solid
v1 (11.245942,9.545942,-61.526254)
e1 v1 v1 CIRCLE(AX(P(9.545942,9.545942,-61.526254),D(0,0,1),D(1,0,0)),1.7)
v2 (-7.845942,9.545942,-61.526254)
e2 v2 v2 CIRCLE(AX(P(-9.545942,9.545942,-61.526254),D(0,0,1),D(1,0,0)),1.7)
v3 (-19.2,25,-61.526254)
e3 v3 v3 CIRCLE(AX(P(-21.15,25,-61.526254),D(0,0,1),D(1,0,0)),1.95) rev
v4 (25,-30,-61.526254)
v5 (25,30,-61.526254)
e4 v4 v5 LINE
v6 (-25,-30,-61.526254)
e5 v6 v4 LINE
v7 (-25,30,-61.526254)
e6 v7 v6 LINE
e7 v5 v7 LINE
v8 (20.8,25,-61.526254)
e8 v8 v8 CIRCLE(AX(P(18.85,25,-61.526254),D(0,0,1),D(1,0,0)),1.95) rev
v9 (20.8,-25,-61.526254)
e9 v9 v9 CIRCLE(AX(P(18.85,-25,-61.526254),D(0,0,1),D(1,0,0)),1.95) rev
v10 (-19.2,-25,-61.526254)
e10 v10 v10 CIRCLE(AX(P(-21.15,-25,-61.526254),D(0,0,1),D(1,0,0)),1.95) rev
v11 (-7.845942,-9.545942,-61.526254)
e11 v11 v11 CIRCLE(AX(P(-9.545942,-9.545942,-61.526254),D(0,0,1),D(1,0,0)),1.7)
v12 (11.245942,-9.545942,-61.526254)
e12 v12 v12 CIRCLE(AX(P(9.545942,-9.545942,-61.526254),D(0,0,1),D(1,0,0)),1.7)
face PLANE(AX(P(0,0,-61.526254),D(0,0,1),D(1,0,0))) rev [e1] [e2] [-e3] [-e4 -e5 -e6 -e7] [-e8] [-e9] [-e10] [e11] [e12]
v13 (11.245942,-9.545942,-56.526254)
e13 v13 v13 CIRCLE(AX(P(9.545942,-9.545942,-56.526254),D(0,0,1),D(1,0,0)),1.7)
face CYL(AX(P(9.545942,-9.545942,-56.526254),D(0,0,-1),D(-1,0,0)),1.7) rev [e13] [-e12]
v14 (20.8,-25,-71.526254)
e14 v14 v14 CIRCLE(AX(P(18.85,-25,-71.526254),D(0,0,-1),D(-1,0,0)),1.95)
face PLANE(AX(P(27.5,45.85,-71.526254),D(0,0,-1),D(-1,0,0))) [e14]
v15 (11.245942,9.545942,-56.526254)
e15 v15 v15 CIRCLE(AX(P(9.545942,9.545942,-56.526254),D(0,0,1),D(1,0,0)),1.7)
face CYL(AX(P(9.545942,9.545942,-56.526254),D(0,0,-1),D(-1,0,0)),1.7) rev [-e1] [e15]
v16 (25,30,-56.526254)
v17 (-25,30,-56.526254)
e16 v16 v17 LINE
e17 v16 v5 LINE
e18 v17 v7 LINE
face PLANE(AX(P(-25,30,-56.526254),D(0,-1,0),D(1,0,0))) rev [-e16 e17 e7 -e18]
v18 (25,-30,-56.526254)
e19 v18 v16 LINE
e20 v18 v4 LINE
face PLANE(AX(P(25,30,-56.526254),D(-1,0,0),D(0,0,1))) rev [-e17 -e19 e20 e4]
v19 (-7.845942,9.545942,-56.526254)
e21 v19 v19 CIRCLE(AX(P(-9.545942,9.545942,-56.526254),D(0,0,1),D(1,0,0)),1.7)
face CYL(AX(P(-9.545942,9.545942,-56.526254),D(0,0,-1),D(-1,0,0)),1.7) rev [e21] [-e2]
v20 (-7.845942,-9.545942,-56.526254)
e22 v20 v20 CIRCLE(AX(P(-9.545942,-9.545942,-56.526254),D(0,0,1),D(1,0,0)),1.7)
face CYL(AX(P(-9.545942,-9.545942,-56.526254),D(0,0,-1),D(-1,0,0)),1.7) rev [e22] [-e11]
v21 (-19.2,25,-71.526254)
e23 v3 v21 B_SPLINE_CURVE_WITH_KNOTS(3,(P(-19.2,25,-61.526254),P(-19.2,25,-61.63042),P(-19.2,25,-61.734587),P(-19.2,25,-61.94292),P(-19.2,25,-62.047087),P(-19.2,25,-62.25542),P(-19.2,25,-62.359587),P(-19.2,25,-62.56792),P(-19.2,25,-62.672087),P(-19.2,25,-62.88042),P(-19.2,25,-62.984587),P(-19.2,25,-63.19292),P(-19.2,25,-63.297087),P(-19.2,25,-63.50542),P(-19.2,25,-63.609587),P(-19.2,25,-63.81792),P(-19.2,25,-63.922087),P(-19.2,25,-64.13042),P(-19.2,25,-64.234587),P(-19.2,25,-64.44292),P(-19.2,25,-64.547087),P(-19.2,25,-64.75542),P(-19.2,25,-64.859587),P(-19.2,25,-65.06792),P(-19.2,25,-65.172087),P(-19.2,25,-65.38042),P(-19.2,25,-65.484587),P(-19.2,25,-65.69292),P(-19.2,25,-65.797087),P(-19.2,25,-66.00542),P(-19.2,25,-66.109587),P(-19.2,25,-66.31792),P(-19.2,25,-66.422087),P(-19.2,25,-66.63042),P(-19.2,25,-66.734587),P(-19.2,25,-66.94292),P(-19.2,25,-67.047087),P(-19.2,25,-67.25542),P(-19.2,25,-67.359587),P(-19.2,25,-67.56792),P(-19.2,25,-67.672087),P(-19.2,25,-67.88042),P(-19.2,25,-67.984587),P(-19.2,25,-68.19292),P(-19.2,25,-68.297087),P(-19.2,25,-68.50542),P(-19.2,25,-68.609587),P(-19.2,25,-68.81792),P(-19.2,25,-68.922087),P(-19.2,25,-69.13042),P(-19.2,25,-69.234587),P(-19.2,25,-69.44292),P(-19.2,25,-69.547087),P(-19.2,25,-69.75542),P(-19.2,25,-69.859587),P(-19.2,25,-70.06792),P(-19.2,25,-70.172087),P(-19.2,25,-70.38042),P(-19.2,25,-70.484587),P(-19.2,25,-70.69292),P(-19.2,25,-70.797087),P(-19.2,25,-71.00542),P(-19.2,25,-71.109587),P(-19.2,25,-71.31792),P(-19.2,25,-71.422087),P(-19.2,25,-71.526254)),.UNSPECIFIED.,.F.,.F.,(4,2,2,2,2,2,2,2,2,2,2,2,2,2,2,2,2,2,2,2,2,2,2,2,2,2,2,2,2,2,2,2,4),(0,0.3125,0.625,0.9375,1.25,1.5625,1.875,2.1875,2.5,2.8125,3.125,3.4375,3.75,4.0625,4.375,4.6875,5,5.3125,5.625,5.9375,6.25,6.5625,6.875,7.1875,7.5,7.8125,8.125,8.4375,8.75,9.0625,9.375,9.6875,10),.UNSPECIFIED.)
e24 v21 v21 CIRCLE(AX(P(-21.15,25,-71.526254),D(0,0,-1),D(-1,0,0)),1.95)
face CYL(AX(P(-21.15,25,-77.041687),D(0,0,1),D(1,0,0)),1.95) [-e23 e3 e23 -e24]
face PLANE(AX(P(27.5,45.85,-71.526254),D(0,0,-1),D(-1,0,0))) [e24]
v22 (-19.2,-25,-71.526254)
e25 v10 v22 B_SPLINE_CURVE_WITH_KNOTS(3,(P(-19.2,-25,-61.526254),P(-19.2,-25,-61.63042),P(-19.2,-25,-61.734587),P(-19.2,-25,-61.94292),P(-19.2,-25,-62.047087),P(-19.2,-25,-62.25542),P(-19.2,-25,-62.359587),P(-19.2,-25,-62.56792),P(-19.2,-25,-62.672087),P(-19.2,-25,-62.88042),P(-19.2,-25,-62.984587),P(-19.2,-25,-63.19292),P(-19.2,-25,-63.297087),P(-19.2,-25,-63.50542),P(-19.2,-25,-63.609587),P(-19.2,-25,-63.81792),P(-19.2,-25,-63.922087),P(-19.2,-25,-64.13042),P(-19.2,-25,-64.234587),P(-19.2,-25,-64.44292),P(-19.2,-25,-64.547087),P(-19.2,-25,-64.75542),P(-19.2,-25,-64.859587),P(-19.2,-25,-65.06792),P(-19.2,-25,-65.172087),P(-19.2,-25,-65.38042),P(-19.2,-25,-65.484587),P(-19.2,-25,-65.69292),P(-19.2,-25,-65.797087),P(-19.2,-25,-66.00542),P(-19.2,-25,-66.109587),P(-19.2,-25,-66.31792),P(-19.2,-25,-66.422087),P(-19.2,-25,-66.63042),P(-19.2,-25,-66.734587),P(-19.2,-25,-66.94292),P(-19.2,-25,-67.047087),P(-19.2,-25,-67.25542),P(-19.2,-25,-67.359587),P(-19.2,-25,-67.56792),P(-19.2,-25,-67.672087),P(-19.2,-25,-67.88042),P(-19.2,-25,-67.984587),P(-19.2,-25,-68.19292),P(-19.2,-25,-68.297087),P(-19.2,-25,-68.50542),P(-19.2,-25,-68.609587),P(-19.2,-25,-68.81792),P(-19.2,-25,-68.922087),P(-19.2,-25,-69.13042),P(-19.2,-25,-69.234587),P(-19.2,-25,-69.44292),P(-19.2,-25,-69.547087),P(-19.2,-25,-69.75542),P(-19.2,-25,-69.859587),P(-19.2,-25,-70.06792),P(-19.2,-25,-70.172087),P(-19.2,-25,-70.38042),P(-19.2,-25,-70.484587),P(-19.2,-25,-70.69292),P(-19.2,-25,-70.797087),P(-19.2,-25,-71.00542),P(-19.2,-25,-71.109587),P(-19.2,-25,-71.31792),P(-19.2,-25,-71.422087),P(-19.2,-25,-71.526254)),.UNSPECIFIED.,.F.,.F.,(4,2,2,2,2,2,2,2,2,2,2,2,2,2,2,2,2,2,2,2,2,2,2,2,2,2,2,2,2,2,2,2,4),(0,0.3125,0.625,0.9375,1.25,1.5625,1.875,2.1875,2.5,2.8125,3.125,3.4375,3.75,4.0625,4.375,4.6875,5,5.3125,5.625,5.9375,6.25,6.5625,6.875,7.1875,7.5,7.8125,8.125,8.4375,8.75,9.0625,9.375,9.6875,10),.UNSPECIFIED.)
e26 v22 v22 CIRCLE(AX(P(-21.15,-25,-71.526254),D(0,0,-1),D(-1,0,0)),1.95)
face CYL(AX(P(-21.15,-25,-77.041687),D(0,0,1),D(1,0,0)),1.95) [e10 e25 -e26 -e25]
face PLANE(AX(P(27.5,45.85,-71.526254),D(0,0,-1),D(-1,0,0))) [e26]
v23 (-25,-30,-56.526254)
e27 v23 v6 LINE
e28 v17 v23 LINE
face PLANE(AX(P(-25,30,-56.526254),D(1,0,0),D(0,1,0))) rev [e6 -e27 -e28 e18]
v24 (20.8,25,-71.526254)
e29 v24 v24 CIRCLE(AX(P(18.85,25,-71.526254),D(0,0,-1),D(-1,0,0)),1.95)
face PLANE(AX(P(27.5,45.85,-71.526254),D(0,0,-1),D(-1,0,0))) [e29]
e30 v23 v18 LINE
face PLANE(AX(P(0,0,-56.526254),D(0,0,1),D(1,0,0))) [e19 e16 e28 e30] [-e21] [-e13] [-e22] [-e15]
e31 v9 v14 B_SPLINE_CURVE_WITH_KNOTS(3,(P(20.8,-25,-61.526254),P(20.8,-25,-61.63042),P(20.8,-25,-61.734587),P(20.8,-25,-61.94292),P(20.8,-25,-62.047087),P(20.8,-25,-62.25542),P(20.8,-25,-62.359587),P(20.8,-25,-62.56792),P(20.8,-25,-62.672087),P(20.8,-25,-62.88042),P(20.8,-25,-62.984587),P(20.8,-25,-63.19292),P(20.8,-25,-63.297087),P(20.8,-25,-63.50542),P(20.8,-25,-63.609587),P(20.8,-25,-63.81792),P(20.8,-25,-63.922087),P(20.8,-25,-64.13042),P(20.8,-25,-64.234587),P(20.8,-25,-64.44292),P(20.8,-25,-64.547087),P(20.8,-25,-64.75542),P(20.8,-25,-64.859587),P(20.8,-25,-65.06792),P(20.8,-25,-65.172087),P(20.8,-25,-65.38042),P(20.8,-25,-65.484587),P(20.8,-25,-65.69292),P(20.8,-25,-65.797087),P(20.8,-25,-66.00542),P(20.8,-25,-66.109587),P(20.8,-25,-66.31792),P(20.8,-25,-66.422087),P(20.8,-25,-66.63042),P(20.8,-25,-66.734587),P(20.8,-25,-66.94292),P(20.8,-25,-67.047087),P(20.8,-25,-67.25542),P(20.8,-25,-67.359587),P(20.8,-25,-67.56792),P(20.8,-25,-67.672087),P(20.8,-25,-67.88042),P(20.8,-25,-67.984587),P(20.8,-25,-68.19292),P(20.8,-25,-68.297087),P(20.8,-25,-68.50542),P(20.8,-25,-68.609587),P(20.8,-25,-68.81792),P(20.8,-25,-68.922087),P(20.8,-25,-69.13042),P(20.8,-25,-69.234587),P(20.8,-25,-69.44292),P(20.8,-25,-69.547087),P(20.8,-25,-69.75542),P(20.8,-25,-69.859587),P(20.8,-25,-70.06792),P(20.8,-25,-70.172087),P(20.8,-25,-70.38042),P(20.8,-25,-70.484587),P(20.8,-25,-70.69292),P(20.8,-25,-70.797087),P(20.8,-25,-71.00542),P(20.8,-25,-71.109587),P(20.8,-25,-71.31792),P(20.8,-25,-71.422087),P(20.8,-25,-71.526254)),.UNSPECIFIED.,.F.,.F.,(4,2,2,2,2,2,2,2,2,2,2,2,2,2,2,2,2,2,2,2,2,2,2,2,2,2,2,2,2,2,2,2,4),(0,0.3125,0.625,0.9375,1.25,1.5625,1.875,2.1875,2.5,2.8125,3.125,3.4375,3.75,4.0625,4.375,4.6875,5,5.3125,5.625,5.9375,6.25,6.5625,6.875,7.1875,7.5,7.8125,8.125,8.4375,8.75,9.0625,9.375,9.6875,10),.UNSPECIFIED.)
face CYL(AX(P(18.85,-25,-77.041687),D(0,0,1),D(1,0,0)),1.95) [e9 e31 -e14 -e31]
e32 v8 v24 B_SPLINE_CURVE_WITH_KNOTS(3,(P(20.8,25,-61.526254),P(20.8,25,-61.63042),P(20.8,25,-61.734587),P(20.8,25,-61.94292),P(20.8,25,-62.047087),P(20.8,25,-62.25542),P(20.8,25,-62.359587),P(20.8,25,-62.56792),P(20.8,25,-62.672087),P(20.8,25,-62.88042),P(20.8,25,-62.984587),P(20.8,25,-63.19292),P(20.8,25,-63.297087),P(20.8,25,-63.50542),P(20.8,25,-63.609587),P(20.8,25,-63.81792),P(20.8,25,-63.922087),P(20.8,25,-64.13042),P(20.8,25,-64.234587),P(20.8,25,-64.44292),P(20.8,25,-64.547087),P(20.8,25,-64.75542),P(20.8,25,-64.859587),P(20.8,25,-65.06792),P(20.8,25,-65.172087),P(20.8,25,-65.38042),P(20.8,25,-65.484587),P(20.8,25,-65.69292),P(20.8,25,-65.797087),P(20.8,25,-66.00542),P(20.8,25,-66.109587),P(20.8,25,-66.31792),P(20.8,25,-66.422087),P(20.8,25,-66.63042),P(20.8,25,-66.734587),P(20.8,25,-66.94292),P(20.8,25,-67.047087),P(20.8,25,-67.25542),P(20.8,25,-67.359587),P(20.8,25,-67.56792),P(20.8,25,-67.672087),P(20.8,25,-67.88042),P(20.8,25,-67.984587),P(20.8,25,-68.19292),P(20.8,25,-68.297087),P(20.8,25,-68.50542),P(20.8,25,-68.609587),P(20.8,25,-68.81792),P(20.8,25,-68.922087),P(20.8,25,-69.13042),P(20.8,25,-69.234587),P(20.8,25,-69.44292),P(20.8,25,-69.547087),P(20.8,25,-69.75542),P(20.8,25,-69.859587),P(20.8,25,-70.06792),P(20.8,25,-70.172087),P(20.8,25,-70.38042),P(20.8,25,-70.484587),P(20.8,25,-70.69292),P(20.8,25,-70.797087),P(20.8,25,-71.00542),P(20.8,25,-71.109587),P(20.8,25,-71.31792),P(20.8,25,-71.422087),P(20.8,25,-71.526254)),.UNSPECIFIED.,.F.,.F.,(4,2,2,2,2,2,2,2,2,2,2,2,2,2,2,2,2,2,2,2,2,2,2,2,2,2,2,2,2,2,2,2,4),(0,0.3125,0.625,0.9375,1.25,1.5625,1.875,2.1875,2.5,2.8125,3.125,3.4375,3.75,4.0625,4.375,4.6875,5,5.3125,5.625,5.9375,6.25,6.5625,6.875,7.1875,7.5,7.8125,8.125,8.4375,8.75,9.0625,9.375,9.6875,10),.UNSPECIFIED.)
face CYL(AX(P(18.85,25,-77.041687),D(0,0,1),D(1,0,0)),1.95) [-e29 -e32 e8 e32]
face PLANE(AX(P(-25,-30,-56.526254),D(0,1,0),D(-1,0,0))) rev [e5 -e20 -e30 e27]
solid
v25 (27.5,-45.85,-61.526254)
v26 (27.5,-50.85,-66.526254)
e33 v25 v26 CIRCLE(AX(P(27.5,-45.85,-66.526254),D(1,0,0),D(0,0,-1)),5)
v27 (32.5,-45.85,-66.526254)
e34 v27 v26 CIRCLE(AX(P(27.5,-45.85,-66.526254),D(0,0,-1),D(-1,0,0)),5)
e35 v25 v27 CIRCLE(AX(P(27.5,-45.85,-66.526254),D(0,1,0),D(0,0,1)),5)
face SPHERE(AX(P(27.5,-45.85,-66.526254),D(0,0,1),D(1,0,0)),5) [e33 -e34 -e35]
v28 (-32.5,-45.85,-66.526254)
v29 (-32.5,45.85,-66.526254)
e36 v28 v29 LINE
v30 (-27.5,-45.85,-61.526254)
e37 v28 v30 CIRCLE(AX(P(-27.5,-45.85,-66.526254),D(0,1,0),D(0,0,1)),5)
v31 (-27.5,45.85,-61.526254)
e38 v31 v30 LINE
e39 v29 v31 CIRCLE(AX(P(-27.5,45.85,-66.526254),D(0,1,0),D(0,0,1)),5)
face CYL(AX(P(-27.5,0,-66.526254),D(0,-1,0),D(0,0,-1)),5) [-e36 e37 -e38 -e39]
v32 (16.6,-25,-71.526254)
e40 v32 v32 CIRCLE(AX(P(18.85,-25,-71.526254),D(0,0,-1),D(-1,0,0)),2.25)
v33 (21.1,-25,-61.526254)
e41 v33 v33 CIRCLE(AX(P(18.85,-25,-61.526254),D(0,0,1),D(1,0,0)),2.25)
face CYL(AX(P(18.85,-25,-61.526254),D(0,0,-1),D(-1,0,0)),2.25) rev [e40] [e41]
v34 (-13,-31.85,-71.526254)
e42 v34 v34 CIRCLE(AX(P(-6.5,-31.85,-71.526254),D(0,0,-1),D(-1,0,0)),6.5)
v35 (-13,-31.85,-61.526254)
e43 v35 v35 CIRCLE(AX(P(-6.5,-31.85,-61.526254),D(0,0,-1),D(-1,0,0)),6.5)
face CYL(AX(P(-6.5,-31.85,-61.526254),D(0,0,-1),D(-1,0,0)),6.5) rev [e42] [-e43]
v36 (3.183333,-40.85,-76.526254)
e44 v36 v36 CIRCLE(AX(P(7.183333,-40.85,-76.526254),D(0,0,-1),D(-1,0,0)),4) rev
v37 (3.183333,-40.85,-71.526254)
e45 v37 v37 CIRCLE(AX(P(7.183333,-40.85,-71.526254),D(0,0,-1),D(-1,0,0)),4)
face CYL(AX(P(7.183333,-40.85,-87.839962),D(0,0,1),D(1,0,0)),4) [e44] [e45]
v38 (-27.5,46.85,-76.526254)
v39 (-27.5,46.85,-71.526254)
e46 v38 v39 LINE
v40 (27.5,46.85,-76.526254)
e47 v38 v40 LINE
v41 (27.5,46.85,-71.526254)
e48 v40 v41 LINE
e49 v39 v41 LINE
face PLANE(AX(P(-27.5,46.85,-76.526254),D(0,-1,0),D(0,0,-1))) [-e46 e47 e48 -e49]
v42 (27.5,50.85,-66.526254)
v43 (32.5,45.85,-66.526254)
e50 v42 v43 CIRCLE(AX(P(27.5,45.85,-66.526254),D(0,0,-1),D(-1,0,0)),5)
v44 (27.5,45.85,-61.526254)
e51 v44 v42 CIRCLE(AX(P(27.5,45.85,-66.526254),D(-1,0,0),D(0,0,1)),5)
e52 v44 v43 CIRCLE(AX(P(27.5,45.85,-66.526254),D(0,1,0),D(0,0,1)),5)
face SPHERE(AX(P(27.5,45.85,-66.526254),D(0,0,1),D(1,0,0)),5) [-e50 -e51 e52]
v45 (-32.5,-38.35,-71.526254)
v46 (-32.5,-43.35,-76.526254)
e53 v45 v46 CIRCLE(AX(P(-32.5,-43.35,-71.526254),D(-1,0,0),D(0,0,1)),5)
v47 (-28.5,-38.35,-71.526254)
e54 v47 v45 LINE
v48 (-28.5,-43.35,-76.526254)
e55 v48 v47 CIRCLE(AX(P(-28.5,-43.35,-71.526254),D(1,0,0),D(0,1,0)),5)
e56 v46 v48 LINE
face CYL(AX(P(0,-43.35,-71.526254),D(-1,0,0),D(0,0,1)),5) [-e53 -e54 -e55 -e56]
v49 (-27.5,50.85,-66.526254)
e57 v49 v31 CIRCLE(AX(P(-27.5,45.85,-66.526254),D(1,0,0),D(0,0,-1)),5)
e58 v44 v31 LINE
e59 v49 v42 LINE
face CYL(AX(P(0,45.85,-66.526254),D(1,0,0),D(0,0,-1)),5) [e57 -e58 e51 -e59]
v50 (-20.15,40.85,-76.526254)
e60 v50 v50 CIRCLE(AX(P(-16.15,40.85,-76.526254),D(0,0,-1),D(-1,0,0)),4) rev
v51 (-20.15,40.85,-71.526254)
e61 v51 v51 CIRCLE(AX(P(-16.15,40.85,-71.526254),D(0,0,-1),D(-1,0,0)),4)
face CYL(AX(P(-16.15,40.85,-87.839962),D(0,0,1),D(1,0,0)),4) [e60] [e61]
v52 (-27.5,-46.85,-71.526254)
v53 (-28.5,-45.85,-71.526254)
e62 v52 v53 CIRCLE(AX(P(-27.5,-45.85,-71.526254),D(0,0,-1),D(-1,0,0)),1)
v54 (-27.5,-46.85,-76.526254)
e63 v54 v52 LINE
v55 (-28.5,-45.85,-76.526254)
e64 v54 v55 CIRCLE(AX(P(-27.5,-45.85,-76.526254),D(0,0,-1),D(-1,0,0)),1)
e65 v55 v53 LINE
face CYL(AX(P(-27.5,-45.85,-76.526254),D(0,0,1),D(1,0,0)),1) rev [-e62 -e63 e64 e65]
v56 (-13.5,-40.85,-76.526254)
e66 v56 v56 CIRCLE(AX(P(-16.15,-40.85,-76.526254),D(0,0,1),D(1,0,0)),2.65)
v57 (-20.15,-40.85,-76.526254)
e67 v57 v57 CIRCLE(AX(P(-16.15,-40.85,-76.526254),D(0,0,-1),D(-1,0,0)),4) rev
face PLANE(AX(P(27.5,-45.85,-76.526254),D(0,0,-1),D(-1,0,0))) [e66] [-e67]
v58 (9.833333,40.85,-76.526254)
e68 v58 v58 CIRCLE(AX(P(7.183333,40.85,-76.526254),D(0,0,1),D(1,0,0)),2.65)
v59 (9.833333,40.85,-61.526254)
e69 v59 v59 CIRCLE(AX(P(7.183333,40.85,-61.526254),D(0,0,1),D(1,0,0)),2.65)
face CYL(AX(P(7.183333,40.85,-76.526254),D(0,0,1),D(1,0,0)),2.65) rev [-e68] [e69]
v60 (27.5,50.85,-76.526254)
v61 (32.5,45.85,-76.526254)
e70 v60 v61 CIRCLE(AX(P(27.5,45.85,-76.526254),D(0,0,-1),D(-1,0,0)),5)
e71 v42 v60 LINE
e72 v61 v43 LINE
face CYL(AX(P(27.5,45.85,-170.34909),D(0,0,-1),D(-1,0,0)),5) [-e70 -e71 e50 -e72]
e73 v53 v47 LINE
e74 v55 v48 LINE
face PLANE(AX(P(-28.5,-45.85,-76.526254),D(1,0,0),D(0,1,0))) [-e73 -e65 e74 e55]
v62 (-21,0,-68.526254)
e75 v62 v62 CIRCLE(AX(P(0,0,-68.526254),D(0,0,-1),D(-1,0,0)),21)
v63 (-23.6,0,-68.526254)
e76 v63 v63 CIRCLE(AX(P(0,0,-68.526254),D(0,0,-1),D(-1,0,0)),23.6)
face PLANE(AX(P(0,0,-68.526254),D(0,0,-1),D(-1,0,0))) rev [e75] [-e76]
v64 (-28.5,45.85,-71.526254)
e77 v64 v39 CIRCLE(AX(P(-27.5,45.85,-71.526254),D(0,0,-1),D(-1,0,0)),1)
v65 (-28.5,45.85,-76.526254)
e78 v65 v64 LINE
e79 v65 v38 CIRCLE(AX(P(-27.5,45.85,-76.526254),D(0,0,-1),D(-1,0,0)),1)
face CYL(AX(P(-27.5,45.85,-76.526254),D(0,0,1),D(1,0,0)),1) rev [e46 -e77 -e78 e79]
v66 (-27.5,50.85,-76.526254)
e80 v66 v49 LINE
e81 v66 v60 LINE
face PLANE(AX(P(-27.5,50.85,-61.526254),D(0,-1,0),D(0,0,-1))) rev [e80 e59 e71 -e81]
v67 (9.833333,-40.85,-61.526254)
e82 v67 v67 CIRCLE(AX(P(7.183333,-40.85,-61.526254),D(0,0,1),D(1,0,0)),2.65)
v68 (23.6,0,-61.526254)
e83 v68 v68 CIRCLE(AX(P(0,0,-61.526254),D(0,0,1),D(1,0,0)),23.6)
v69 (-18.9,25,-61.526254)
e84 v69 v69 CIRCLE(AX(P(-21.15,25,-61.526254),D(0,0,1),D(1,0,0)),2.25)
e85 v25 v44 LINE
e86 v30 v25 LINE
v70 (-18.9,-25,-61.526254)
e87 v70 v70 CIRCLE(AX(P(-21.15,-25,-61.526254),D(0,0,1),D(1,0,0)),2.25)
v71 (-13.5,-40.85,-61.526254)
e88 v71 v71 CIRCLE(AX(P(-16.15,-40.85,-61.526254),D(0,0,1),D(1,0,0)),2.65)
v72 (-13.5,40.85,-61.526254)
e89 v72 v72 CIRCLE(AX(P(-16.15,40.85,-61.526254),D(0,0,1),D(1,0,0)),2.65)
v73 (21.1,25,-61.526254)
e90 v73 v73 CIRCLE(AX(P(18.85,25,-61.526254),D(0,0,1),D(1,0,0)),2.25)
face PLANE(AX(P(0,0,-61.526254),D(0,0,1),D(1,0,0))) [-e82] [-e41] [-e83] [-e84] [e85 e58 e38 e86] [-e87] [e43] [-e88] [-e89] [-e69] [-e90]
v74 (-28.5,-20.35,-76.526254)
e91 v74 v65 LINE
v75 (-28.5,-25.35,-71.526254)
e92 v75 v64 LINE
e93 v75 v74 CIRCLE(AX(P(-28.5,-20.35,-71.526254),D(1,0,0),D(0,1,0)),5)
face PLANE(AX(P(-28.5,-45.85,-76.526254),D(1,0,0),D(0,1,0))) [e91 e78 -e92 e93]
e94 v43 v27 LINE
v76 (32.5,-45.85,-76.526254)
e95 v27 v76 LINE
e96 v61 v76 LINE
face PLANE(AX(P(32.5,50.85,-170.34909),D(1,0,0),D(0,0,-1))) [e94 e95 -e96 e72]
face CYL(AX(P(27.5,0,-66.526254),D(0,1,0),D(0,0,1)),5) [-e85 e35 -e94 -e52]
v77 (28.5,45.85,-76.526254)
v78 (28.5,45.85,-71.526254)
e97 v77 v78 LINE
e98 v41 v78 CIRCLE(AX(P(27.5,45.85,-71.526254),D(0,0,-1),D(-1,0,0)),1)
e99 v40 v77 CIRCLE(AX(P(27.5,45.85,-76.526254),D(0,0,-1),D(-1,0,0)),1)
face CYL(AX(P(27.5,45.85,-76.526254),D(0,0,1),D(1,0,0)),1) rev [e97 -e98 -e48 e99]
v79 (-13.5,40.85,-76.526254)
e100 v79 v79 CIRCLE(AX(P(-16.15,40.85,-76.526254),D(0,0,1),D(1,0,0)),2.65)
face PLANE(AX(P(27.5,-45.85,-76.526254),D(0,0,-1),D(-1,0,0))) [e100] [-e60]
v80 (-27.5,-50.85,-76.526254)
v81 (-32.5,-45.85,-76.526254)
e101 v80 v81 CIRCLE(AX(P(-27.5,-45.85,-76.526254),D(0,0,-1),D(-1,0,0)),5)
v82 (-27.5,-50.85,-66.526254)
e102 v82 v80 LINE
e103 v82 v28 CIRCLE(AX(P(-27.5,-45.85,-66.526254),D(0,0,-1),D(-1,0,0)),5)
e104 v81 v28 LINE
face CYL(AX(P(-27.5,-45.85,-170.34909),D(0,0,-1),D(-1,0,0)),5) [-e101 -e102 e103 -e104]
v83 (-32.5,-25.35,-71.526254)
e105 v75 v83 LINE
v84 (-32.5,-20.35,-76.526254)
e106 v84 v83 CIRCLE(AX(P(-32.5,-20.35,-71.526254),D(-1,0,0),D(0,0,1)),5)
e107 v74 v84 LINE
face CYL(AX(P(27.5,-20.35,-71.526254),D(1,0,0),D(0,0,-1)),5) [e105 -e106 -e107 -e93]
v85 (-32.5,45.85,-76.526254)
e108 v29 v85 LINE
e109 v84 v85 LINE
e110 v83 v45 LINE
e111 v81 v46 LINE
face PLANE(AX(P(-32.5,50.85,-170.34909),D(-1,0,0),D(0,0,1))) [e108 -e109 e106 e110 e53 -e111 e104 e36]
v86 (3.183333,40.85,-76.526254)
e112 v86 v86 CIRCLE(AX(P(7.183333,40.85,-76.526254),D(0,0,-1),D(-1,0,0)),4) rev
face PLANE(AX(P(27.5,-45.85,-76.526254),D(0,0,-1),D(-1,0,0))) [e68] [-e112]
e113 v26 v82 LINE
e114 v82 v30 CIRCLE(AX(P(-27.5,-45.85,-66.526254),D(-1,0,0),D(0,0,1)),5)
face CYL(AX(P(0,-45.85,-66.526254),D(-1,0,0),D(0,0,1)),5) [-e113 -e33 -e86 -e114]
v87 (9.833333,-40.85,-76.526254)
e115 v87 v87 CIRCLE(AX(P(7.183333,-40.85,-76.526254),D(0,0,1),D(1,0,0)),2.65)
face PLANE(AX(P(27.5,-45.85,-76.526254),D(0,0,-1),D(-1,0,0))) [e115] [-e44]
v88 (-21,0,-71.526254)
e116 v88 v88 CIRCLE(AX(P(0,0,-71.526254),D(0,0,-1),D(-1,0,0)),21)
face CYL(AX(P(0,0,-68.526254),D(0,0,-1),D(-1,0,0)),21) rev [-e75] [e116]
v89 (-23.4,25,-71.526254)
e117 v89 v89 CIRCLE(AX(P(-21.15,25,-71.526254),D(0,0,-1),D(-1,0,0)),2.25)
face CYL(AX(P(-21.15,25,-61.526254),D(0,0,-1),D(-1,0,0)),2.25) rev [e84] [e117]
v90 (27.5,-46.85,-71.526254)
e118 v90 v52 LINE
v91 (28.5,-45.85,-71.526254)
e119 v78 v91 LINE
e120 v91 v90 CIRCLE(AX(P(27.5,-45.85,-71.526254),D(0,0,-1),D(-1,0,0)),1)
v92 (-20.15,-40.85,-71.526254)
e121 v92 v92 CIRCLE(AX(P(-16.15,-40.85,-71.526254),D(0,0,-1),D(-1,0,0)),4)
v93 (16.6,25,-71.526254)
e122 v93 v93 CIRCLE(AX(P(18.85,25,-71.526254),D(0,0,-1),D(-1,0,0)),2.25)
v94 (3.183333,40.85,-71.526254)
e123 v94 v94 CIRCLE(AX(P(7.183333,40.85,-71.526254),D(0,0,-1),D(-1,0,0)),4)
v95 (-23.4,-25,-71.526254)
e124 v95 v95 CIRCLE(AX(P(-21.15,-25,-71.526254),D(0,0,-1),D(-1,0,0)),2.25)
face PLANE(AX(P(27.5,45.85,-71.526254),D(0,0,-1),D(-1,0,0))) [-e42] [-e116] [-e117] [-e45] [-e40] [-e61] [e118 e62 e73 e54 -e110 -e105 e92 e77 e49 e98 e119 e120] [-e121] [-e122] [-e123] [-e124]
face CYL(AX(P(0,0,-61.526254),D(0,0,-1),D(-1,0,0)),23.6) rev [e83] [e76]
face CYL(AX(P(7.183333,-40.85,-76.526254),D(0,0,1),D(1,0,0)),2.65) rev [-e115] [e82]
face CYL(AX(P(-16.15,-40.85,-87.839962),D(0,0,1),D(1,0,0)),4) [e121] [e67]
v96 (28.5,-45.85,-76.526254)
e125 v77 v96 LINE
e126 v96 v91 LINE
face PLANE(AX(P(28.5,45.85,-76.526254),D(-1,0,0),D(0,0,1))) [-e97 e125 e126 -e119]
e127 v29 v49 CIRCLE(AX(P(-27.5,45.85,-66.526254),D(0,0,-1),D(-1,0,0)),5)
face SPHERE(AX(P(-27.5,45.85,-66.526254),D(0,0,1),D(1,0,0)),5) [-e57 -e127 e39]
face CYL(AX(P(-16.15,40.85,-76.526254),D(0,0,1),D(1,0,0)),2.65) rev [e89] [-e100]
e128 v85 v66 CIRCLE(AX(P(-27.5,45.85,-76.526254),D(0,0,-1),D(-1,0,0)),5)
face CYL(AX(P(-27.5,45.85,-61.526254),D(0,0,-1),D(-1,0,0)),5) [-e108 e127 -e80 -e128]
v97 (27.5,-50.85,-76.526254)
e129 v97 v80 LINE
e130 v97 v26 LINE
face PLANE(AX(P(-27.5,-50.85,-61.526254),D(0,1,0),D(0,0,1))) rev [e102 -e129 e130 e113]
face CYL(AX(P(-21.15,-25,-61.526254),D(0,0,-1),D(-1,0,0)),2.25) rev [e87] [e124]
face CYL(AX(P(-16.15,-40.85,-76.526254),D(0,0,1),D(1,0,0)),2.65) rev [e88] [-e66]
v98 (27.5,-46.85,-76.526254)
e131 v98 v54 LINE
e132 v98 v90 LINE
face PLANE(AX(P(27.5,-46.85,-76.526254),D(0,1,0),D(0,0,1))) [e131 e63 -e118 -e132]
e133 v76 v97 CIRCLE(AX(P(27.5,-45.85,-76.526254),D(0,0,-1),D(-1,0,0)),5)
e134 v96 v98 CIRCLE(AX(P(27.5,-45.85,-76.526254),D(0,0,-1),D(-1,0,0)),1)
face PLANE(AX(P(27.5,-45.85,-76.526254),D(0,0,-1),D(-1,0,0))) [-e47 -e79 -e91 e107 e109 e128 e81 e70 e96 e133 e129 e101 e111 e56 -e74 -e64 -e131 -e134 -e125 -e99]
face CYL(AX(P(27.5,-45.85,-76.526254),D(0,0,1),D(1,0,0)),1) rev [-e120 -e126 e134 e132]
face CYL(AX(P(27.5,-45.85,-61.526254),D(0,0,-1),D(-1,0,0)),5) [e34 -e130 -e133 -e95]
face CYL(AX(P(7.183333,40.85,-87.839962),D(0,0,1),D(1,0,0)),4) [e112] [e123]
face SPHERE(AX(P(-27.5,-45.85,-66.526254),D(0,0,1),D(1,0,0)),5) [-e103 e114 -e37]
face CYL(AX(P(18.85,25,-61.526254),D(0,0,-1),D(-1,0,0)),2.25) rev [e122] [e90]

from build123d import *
from build123d.topology import SkipClean

# Parameters (mm, degrees)
STOCK_PART13_1_START       = -68.526253649
STOCK_PART13_1_OUTLINE_W   = 55
STOCK_PART13_1_OUTLINE_H   = 101.7
STOCK_PART13_1_OUTLINE_R   = 1.65
STOCK_PART13_1_OUTLINE_R_2 = 2.25
STOCK_PART13_1_OUTLINE_R_3 = 23.6
STOCK_PART13_1_DEPTH       = 7
SKETCH3_W                  = 5
SKETCH3_H                  = 101.7
BOSS_EXTRUDE1_DEPTH        = 7
FILLET2_R                  = 5
EXTRUDE_THIN1_START        = 8
EXTRUDE_THIN1_DEPTH        = 8
FILLET3_R                  = 5
BOSS_EXTRUDE2_START        = 3
SKETCH7_R                  = 1.65
SKETCH7_R_2                = 2.25
SKETCH7_R_3                = 23.6
BOSS_EXTRUDE2_DEPTH        = 3
SKETCH8_R                  = 23.6
SKETCH8_R_2                = 21
BOSS_EXTRUDE3_DEPTH        = 3
BOSS_EXTRUDE4_START        = -15
SKETCH9_R                  = 4
SKETCH9_R_2                = 1.65
BOSS_EXTRUDE4_DEPTH        = 15
SKETCH10_R                 = 6.5
CUT_EXTRUDE1_DEPTH         = 62.171664192
SKETCH11_W                 = 4
SKETCH11_H                 = 13
CUT_EXTRUDE4_DEPTH         = 62.171664192
FILLET4_R                  = 5
SKETCH12_R                 = 2.65
CUT_EXTRUDE5_DEPTH         = 63.18498613
SKETCH14_W                 = 50
SKETCH14_H                 = 60
SKETCH14_R                 = 1.7
BOSS_EXTRUDE5_DEPTH        = 5
SKETCH16_R                 = 1.95
BOSS_EXTRUDE6_DEPTH        = 10


# Read off the part's stored shape, not the designer's step: Stock-Part13-1
with BuildPart() as part:
    # Stock-Part13-1 outline → Stock-Part13-1 (new body)
    with BuildSketch(Plane.XY.offset(STOCK_PART13_1_START)):
        Rectangle(STOCK_PART13_1_OUTLINE_W, STOCK_PART13_1_OUTLINE_H)
        with Locations((-16.15, -40.85)):
            Circle(STOCK_PART13_1_OUTLINE_R, mode=Mode.SUBTRACT)
        with Locations((-21.15, -25)):
            Circle(STOCK_PART13_1_OUTLINE_R_2, mode=Mode.SUBTRACT)
        with Locations((7.183333333, -40.85)):
            Circle(STOCK_PART13_1_OUTLINE_R, mode=Mode.SUBTRACT)
        with Locations((18.85, -25)):
            Circle(STOCK_PART13_1_OUTLINE_R_2, mode=Mode.SUBTRACT)
        with Locations((-21.15, 25)):
            Circle(STOCK_PART13_1_OUTLINE_R_2, mode=Mode.SUBTRACT)
        with Locations((-16.15, 40.85)):
            Circle(STOCK_PART13_1_OUTLINE_R, mode=Mode.SUBTRACT)
        Circle(STOCK_PART13_1_OUTLINE_R_3, mode=Mode.SUBTRACT)
        with Locations((18.85, 25)):
            Circle(STOCK_PART13_1_OUTLINE_R_2, mode=Mode.SUBTRACT)
        with Locations((7.183333333, 40.85)):
            Circle(STOCK_PART13_1_OUTLINE_R, mode=Mode.SUBTRACT)
    extrude(amount=STOCK_PART13_1_DEPTH)

    # Sketch3 → Boss-Extrude1 (add)
    with BuildSketch(Plane.XY.offset(-61.526253649)):
        with Locations((-30, 0)):
            Rectangle(SKETCH3_W, SKETCH3_H)
        with Locations((30, 0)):
            Rectangle(SKETCH3_W, SKETCH3_H)
    extrude(amount=-BOSS_EXTRUDE1_DEPTH)

    # Fillet2
    fillet2_edges = [part.edges().sort_by_distance(p)[0] for p in [
        (-32.5, -50.85, -65.026253649),
        (-32.5, 50.85, -65.026253649),
        (32.5, 50.85, -65.026253649),
        (32.5, -50.85, -65.026253649),
    ]]
    fillet(fillet2_edges, radius=FILLET2_R)

    # Sketch5 → Extrude-Thin1 (add)
    with BuildSketch(Plane(origin=(0, 0, -68.526253649), x_dir=(-1, 0, 0), z_dir=(0, 0, -1)).offset(EXTRUDE_THIN1_START)):
        with BuildLine():
            Line((-27.5, -50.85), (27.5, -50.85))
            ThreePointArc((27.5, -50.85), (31.035533906, -49.385533906), (32.5, -45.85))
            Line((32.5, -45.85), (32.5, 45.85))
            ThreePointArc((32.5, 45.85), (31.035533906, 49.385533906), (27.5, 50.85))
            Line((27.5, 50.85), (-27.5, 50.85))
            ThreePointArc((-27.5, 50.85), (-31.035533906, 49.385533906), (-32.5, 45.85))
            Line((-32.5, 45.85), (-32.5, -45.85))
            ThreePointArc((-32.5, -45.85), (-31.035533906, -49.385533906), (-27.5, -50.85))
        make_face()
        with BuildLine():
            Line((-27.5, -46.85), (27.5, -46.85))
            ThreePointArc((27.5, -46.85), (28.207106781, -46.557106781), (28.5, -45.85))
            Line((28.5, -45.85), (28.5, 45.85))
            ThreePointArc((28.5, 45.85), (28.207106781, 46.557106781), (27.5, 46.85))
            Line((27.5, 46.85), (-27.5, 46.85))
            ThreePointArc((-27.5, 46.85), (-28.207106781, 46.557106781), (-28.5, 45.85))
            Line((-28.5, 45.85), (-28.5, -45.85))
            ThreePointArc((-28.5, -45.85), (-28.207106781, -46.557106781), (-27.5, -46.85))
        make_face(mode=Mode.SUBTRACT)
    extrude(amount=-EXTRUDE_THIN1_DEPTH)

    # Fillet3
    fillet3_edges = [part.edges().sort_by_distance(p)[0] for p in [
        (-32.5, 0, -61.526253649),
        (0, -50.85, -61.526253649),
        (32.5, 0, -61.526253649),
        (0, 50.85, -61.526253649),
        (-31.035533906, 49.385533906, -61.526253649),
        (31.035533906, 49.385533906, -61.526253649),
        (31.035533906, -49.385533906, -61.526253649),
        (-31.035533906, -49.385533906, -61.526253649),
    ]]
    fillet(fillet3_edges, radius=FILLET3_R)

    # Sketch7 → Boss-Extrude2 (add)
    with SkipClean():  # the faces are left unmerged after this step: merging them gives an invalid solid
        with BuildSketch(Plane(origin=(0, 0, -68.526253649), x_dir=(-1, 0, 0), z_dir=(0, 0, -1)).offset(BOSS_EXTRUDE2_START)):
            with BuildLine():
                Line((-28.5, 45.85), (-28.5, -45.85))
                ThreePointArc((-28.5, -45.85), (-28.207106781, -46.557106781), (-27.5, -46.85))
                Line((-27.5, -46.85), (27.5, -46.85))
                ThreePointArc((27.5, -46.85), (28.207106781, -46.557106781), (28.5, -45.85))
                Line((28.5, -45.85), (28.5, 45.85))
                ThreePointArc((28.5, 45.85), (28.207106781, 46.557106781), (27.5, 46.85))
                Line((27.5, 46.85), (-27.5, 46.85))
                ThreePointArc((-27.5, 46.85), (-28.207106781, 46.557106781), (-28.5, 45.85))
            make_face()
            with Locations((-7.183333333, -40.85)):
                Circle(SKETCH7_R, mode=Mode.SUBTRACT)
            with Locations((16.15, -40.85)):
                Circle(SKETCH7_R, mode=Mode.SUBTRACT)
            with Locations((21.15, -25)):
                Circle(SKETCH7_R_2, mode=Mode.SUBTRACT)
            with Locations((-18.85, -25)):
                Circle(SKETCH7_R_2, mode=Mode.SUBTRACT)
            Circle(SKETCH7_R_3, mode=Mode.SUBTRACT)
            with Locations((21.15, 25)):
                Circle(SKETCH7_R_2, mode=Mode.SUBTRACT)
            with Locations((-7.183333333, 40.85)):
                Circle(SKETCH7_R, mode=Mode.SUBTRACT)
            with Locations((16.15, 40.85)):
                Circle(SKETCH7_R, mode=Mode.SUBTRACT)
            with Locations((-18.85, 25)):
                Circle(SKETCH7_R_2, mode=Mode.SUBTRACT)
        extrude(amount=-BOSS_EXTRUDE2_DEPTH)

    # Sketch8 → Boss-Extrude3 (add)
    with SkipClean():  # the faces are left unmerged after this step: merging them gives an invalid solid
        with BuildSketch(Plane(origin=(0, 0, -71.526253649), x_dir=(-1, 0, 0), z_dir=(0, 0, -1))):
            Circle(SKETCH8_R)
            Circle(SKETCH8_R_2, mode=Mode.SUBTRACT)
        extrude(amount=-BOSS_EXTRUDE3_DEPTH)

    # Sketch9 → Boss-Extrude4 (add)
    # profile 1 of 4: a face of its own
    with SkipClean():  # the faces are left unmerged after this step: merging them gives an invalid solid
        with BuildSketch(Plane.XY.offset(-61.526253649).offset(BOSS_EXTRUDE4_START)):
            with Locations(Location((7.183333333, 40.85, 0), (0, 0, 180))):
                Circle(SKETCH9_R)
            with Locations(Location((7.183333333, 40.85, 0), (0, 0, 180))):
                Circle(SKETCH9_R_2, mode=Mode.SUBTRACT)
        # profile 2 of 4: a face of its own
        with BuildSketch(Plane.XY.offset(-61.526253649).offset(BOSS_EXTRUDE4_START)):
            with Locations(Location((-16.15, 40.85, 0), (0, 0, 180))):
                Circle(SKETCH9_R)
            with Locations(Location((-16.15, 40.85, 0), (0, 0, 180))):
                Circle(SKETCH9_R_2, mode=Mode.SUBTRACT)
        # profile 3 of 4: a face of its own
        with BuildSketch(Plane.XY.offset(-61.526253649).offset(BOSS_EXTRUDE4_START)):
            with Locations(Location((-16.15, -40.85, 0), (0, 0, 180))):
                Circle(SKETCH9_R)
            with Locations(Location((-16.15, -40.85, 0), (0, 0, 180))):
                Circle(SKETCH9_R_2, mode=Mode.SUBTRACT)
        # profile 4 of 4: a face of its own
        with BuildSketch(Plane.XY.offset(-61.526253649).offset(BOSS_EXTRUDE4_START)):
            with Locations(Location((7.183333333, -40.85, 0), (0, 0, 180))):
                Circle(SKETCH9_R)
            with Locations(Location((7.183333333, -40.85, 0), (0, 0, 180))):
                Circle(SKETCH9_R_2, mode=Mode.SUBTRACT)
        extrude(amount=BOSS_EXTRUDE4_DEPTH)

    # Sketch10 → Cut-Extrude1 (cut, through all)
    with SkipClean():  # the faces are left unmerged after this step: merging them gives an invalid solid
        with BuildSketch(Plane(origin=(0, 0, -71.526253649), x_dir=(-1, 0, 0), z_dir=(0, 0, -1))):
            with Locations((6.5, -31.85)):
                Circle(SKETCH10_R)
        extrude(amount=-CUT_EXTRUDE1_DEPTH, mode=Mode.SUBTRACT)

    # Sketch11 → Cut-Extrude4 (cut, through all)
    with SkipClean():  # the faces are left unmerged after this step: merging them gives an invalid solid
        with BuildSketch(Plane(origin=(0, 0, -71.526253649), x_dir=(-1, 0, 0), z_dir=(0, 0, -1))):
            with Locations((30.5, -31.85)):
                Rectangle(SKETCH11_W, SKETCH11_H)
        extrude(amount=CUT_EXTRUDE4_DEPTH, mode=Mode.SUBTRACT)

    # Fillet4
    fillet4_edges = [part.edges().sort_by_distance(p)[0] for p in [
        (-30.5, -38.35, -76.526253649),
        (-30.5, -25.35, -76.526253649),
    ]]
    fillet(fillet4_edges, radius=FILLET4_R - 0.0001)  # a hair under: the kernel refuses the full size

    # Sketch12 → Cut-Extrude5 (cut, through all)
    with BuildSketch(Plane.XY.offset(-61.526253649)):
        with Locations((-16.15, 40.85)):
            Circle(SKETCH12_R)
        with Locations((7.183333333, 40.85)):
            Circle(SKETCH12_R)
        with Locations((7.183333333, -40.85)):
            Circle(SKETCH12_R)
        with Locations((-16.15, -40.85)):
            Circle(SKETCH12_R)
    extrude(amount=-CUT_EXTRUDE5_DEPTH, mode=Mode.SUBTRACT)


with BuildPart() as body_2:
    # Sketch14 → Boss-Extrude5 (new body)
    with BuildSketch(Plane.XY.offset(-61.526253649)):
        Rectangle(SKETCH14_W, SKETCH14_H)
        with Locations((9.545941546, 9.545941546)):
            Circle(SKETCH14_R, mode=Mode.SUBTRACT)
        with Locations((9.545941546, -9.545941546)):
            Circle(SKETCH14_R, mode=Mode.SUBTRACT)
        with Locations((-9.545941546, -9.545941546)):
            Circle(SKETCH14_R, mode=Mode.SUBTRACT)
        with Locations((-9.545941546, 9.545941546)):
            Circle(SKETCH14_R, mode=Mode.SUBTRACT)
    extrude(amount=BOSS_EXTRUDE5_DEPTH)

    # Sketch16 → Boss-Extrude6 (add)
    with BuildSketch(Plane(origin=(0, 0, -61.526253649), x_dir=(-1, 0, 0), z_dir=(0, 0, -1))):
        with Locations(Location((-18.85, 25, 0), (0, 0, 180))):
            Circle(SKETCH16_R)
        with Locations(Location((21.15, 25, 0), (0, 0, 180))):
            Circle(SKETCH16_R)
        with Locations(Location((-18.85, -25, 0), (0, 0, 180))):
            Circle(SKETCH16_R)
        with Locations(Location((21.15, -25, 0), (0, 0, 180))):
            Circle(SKETCH16_R)
    extrude(amount=BOSS_EXTRUDE6_DEPTH)


solid = Compound([part.part, body_2.part])
